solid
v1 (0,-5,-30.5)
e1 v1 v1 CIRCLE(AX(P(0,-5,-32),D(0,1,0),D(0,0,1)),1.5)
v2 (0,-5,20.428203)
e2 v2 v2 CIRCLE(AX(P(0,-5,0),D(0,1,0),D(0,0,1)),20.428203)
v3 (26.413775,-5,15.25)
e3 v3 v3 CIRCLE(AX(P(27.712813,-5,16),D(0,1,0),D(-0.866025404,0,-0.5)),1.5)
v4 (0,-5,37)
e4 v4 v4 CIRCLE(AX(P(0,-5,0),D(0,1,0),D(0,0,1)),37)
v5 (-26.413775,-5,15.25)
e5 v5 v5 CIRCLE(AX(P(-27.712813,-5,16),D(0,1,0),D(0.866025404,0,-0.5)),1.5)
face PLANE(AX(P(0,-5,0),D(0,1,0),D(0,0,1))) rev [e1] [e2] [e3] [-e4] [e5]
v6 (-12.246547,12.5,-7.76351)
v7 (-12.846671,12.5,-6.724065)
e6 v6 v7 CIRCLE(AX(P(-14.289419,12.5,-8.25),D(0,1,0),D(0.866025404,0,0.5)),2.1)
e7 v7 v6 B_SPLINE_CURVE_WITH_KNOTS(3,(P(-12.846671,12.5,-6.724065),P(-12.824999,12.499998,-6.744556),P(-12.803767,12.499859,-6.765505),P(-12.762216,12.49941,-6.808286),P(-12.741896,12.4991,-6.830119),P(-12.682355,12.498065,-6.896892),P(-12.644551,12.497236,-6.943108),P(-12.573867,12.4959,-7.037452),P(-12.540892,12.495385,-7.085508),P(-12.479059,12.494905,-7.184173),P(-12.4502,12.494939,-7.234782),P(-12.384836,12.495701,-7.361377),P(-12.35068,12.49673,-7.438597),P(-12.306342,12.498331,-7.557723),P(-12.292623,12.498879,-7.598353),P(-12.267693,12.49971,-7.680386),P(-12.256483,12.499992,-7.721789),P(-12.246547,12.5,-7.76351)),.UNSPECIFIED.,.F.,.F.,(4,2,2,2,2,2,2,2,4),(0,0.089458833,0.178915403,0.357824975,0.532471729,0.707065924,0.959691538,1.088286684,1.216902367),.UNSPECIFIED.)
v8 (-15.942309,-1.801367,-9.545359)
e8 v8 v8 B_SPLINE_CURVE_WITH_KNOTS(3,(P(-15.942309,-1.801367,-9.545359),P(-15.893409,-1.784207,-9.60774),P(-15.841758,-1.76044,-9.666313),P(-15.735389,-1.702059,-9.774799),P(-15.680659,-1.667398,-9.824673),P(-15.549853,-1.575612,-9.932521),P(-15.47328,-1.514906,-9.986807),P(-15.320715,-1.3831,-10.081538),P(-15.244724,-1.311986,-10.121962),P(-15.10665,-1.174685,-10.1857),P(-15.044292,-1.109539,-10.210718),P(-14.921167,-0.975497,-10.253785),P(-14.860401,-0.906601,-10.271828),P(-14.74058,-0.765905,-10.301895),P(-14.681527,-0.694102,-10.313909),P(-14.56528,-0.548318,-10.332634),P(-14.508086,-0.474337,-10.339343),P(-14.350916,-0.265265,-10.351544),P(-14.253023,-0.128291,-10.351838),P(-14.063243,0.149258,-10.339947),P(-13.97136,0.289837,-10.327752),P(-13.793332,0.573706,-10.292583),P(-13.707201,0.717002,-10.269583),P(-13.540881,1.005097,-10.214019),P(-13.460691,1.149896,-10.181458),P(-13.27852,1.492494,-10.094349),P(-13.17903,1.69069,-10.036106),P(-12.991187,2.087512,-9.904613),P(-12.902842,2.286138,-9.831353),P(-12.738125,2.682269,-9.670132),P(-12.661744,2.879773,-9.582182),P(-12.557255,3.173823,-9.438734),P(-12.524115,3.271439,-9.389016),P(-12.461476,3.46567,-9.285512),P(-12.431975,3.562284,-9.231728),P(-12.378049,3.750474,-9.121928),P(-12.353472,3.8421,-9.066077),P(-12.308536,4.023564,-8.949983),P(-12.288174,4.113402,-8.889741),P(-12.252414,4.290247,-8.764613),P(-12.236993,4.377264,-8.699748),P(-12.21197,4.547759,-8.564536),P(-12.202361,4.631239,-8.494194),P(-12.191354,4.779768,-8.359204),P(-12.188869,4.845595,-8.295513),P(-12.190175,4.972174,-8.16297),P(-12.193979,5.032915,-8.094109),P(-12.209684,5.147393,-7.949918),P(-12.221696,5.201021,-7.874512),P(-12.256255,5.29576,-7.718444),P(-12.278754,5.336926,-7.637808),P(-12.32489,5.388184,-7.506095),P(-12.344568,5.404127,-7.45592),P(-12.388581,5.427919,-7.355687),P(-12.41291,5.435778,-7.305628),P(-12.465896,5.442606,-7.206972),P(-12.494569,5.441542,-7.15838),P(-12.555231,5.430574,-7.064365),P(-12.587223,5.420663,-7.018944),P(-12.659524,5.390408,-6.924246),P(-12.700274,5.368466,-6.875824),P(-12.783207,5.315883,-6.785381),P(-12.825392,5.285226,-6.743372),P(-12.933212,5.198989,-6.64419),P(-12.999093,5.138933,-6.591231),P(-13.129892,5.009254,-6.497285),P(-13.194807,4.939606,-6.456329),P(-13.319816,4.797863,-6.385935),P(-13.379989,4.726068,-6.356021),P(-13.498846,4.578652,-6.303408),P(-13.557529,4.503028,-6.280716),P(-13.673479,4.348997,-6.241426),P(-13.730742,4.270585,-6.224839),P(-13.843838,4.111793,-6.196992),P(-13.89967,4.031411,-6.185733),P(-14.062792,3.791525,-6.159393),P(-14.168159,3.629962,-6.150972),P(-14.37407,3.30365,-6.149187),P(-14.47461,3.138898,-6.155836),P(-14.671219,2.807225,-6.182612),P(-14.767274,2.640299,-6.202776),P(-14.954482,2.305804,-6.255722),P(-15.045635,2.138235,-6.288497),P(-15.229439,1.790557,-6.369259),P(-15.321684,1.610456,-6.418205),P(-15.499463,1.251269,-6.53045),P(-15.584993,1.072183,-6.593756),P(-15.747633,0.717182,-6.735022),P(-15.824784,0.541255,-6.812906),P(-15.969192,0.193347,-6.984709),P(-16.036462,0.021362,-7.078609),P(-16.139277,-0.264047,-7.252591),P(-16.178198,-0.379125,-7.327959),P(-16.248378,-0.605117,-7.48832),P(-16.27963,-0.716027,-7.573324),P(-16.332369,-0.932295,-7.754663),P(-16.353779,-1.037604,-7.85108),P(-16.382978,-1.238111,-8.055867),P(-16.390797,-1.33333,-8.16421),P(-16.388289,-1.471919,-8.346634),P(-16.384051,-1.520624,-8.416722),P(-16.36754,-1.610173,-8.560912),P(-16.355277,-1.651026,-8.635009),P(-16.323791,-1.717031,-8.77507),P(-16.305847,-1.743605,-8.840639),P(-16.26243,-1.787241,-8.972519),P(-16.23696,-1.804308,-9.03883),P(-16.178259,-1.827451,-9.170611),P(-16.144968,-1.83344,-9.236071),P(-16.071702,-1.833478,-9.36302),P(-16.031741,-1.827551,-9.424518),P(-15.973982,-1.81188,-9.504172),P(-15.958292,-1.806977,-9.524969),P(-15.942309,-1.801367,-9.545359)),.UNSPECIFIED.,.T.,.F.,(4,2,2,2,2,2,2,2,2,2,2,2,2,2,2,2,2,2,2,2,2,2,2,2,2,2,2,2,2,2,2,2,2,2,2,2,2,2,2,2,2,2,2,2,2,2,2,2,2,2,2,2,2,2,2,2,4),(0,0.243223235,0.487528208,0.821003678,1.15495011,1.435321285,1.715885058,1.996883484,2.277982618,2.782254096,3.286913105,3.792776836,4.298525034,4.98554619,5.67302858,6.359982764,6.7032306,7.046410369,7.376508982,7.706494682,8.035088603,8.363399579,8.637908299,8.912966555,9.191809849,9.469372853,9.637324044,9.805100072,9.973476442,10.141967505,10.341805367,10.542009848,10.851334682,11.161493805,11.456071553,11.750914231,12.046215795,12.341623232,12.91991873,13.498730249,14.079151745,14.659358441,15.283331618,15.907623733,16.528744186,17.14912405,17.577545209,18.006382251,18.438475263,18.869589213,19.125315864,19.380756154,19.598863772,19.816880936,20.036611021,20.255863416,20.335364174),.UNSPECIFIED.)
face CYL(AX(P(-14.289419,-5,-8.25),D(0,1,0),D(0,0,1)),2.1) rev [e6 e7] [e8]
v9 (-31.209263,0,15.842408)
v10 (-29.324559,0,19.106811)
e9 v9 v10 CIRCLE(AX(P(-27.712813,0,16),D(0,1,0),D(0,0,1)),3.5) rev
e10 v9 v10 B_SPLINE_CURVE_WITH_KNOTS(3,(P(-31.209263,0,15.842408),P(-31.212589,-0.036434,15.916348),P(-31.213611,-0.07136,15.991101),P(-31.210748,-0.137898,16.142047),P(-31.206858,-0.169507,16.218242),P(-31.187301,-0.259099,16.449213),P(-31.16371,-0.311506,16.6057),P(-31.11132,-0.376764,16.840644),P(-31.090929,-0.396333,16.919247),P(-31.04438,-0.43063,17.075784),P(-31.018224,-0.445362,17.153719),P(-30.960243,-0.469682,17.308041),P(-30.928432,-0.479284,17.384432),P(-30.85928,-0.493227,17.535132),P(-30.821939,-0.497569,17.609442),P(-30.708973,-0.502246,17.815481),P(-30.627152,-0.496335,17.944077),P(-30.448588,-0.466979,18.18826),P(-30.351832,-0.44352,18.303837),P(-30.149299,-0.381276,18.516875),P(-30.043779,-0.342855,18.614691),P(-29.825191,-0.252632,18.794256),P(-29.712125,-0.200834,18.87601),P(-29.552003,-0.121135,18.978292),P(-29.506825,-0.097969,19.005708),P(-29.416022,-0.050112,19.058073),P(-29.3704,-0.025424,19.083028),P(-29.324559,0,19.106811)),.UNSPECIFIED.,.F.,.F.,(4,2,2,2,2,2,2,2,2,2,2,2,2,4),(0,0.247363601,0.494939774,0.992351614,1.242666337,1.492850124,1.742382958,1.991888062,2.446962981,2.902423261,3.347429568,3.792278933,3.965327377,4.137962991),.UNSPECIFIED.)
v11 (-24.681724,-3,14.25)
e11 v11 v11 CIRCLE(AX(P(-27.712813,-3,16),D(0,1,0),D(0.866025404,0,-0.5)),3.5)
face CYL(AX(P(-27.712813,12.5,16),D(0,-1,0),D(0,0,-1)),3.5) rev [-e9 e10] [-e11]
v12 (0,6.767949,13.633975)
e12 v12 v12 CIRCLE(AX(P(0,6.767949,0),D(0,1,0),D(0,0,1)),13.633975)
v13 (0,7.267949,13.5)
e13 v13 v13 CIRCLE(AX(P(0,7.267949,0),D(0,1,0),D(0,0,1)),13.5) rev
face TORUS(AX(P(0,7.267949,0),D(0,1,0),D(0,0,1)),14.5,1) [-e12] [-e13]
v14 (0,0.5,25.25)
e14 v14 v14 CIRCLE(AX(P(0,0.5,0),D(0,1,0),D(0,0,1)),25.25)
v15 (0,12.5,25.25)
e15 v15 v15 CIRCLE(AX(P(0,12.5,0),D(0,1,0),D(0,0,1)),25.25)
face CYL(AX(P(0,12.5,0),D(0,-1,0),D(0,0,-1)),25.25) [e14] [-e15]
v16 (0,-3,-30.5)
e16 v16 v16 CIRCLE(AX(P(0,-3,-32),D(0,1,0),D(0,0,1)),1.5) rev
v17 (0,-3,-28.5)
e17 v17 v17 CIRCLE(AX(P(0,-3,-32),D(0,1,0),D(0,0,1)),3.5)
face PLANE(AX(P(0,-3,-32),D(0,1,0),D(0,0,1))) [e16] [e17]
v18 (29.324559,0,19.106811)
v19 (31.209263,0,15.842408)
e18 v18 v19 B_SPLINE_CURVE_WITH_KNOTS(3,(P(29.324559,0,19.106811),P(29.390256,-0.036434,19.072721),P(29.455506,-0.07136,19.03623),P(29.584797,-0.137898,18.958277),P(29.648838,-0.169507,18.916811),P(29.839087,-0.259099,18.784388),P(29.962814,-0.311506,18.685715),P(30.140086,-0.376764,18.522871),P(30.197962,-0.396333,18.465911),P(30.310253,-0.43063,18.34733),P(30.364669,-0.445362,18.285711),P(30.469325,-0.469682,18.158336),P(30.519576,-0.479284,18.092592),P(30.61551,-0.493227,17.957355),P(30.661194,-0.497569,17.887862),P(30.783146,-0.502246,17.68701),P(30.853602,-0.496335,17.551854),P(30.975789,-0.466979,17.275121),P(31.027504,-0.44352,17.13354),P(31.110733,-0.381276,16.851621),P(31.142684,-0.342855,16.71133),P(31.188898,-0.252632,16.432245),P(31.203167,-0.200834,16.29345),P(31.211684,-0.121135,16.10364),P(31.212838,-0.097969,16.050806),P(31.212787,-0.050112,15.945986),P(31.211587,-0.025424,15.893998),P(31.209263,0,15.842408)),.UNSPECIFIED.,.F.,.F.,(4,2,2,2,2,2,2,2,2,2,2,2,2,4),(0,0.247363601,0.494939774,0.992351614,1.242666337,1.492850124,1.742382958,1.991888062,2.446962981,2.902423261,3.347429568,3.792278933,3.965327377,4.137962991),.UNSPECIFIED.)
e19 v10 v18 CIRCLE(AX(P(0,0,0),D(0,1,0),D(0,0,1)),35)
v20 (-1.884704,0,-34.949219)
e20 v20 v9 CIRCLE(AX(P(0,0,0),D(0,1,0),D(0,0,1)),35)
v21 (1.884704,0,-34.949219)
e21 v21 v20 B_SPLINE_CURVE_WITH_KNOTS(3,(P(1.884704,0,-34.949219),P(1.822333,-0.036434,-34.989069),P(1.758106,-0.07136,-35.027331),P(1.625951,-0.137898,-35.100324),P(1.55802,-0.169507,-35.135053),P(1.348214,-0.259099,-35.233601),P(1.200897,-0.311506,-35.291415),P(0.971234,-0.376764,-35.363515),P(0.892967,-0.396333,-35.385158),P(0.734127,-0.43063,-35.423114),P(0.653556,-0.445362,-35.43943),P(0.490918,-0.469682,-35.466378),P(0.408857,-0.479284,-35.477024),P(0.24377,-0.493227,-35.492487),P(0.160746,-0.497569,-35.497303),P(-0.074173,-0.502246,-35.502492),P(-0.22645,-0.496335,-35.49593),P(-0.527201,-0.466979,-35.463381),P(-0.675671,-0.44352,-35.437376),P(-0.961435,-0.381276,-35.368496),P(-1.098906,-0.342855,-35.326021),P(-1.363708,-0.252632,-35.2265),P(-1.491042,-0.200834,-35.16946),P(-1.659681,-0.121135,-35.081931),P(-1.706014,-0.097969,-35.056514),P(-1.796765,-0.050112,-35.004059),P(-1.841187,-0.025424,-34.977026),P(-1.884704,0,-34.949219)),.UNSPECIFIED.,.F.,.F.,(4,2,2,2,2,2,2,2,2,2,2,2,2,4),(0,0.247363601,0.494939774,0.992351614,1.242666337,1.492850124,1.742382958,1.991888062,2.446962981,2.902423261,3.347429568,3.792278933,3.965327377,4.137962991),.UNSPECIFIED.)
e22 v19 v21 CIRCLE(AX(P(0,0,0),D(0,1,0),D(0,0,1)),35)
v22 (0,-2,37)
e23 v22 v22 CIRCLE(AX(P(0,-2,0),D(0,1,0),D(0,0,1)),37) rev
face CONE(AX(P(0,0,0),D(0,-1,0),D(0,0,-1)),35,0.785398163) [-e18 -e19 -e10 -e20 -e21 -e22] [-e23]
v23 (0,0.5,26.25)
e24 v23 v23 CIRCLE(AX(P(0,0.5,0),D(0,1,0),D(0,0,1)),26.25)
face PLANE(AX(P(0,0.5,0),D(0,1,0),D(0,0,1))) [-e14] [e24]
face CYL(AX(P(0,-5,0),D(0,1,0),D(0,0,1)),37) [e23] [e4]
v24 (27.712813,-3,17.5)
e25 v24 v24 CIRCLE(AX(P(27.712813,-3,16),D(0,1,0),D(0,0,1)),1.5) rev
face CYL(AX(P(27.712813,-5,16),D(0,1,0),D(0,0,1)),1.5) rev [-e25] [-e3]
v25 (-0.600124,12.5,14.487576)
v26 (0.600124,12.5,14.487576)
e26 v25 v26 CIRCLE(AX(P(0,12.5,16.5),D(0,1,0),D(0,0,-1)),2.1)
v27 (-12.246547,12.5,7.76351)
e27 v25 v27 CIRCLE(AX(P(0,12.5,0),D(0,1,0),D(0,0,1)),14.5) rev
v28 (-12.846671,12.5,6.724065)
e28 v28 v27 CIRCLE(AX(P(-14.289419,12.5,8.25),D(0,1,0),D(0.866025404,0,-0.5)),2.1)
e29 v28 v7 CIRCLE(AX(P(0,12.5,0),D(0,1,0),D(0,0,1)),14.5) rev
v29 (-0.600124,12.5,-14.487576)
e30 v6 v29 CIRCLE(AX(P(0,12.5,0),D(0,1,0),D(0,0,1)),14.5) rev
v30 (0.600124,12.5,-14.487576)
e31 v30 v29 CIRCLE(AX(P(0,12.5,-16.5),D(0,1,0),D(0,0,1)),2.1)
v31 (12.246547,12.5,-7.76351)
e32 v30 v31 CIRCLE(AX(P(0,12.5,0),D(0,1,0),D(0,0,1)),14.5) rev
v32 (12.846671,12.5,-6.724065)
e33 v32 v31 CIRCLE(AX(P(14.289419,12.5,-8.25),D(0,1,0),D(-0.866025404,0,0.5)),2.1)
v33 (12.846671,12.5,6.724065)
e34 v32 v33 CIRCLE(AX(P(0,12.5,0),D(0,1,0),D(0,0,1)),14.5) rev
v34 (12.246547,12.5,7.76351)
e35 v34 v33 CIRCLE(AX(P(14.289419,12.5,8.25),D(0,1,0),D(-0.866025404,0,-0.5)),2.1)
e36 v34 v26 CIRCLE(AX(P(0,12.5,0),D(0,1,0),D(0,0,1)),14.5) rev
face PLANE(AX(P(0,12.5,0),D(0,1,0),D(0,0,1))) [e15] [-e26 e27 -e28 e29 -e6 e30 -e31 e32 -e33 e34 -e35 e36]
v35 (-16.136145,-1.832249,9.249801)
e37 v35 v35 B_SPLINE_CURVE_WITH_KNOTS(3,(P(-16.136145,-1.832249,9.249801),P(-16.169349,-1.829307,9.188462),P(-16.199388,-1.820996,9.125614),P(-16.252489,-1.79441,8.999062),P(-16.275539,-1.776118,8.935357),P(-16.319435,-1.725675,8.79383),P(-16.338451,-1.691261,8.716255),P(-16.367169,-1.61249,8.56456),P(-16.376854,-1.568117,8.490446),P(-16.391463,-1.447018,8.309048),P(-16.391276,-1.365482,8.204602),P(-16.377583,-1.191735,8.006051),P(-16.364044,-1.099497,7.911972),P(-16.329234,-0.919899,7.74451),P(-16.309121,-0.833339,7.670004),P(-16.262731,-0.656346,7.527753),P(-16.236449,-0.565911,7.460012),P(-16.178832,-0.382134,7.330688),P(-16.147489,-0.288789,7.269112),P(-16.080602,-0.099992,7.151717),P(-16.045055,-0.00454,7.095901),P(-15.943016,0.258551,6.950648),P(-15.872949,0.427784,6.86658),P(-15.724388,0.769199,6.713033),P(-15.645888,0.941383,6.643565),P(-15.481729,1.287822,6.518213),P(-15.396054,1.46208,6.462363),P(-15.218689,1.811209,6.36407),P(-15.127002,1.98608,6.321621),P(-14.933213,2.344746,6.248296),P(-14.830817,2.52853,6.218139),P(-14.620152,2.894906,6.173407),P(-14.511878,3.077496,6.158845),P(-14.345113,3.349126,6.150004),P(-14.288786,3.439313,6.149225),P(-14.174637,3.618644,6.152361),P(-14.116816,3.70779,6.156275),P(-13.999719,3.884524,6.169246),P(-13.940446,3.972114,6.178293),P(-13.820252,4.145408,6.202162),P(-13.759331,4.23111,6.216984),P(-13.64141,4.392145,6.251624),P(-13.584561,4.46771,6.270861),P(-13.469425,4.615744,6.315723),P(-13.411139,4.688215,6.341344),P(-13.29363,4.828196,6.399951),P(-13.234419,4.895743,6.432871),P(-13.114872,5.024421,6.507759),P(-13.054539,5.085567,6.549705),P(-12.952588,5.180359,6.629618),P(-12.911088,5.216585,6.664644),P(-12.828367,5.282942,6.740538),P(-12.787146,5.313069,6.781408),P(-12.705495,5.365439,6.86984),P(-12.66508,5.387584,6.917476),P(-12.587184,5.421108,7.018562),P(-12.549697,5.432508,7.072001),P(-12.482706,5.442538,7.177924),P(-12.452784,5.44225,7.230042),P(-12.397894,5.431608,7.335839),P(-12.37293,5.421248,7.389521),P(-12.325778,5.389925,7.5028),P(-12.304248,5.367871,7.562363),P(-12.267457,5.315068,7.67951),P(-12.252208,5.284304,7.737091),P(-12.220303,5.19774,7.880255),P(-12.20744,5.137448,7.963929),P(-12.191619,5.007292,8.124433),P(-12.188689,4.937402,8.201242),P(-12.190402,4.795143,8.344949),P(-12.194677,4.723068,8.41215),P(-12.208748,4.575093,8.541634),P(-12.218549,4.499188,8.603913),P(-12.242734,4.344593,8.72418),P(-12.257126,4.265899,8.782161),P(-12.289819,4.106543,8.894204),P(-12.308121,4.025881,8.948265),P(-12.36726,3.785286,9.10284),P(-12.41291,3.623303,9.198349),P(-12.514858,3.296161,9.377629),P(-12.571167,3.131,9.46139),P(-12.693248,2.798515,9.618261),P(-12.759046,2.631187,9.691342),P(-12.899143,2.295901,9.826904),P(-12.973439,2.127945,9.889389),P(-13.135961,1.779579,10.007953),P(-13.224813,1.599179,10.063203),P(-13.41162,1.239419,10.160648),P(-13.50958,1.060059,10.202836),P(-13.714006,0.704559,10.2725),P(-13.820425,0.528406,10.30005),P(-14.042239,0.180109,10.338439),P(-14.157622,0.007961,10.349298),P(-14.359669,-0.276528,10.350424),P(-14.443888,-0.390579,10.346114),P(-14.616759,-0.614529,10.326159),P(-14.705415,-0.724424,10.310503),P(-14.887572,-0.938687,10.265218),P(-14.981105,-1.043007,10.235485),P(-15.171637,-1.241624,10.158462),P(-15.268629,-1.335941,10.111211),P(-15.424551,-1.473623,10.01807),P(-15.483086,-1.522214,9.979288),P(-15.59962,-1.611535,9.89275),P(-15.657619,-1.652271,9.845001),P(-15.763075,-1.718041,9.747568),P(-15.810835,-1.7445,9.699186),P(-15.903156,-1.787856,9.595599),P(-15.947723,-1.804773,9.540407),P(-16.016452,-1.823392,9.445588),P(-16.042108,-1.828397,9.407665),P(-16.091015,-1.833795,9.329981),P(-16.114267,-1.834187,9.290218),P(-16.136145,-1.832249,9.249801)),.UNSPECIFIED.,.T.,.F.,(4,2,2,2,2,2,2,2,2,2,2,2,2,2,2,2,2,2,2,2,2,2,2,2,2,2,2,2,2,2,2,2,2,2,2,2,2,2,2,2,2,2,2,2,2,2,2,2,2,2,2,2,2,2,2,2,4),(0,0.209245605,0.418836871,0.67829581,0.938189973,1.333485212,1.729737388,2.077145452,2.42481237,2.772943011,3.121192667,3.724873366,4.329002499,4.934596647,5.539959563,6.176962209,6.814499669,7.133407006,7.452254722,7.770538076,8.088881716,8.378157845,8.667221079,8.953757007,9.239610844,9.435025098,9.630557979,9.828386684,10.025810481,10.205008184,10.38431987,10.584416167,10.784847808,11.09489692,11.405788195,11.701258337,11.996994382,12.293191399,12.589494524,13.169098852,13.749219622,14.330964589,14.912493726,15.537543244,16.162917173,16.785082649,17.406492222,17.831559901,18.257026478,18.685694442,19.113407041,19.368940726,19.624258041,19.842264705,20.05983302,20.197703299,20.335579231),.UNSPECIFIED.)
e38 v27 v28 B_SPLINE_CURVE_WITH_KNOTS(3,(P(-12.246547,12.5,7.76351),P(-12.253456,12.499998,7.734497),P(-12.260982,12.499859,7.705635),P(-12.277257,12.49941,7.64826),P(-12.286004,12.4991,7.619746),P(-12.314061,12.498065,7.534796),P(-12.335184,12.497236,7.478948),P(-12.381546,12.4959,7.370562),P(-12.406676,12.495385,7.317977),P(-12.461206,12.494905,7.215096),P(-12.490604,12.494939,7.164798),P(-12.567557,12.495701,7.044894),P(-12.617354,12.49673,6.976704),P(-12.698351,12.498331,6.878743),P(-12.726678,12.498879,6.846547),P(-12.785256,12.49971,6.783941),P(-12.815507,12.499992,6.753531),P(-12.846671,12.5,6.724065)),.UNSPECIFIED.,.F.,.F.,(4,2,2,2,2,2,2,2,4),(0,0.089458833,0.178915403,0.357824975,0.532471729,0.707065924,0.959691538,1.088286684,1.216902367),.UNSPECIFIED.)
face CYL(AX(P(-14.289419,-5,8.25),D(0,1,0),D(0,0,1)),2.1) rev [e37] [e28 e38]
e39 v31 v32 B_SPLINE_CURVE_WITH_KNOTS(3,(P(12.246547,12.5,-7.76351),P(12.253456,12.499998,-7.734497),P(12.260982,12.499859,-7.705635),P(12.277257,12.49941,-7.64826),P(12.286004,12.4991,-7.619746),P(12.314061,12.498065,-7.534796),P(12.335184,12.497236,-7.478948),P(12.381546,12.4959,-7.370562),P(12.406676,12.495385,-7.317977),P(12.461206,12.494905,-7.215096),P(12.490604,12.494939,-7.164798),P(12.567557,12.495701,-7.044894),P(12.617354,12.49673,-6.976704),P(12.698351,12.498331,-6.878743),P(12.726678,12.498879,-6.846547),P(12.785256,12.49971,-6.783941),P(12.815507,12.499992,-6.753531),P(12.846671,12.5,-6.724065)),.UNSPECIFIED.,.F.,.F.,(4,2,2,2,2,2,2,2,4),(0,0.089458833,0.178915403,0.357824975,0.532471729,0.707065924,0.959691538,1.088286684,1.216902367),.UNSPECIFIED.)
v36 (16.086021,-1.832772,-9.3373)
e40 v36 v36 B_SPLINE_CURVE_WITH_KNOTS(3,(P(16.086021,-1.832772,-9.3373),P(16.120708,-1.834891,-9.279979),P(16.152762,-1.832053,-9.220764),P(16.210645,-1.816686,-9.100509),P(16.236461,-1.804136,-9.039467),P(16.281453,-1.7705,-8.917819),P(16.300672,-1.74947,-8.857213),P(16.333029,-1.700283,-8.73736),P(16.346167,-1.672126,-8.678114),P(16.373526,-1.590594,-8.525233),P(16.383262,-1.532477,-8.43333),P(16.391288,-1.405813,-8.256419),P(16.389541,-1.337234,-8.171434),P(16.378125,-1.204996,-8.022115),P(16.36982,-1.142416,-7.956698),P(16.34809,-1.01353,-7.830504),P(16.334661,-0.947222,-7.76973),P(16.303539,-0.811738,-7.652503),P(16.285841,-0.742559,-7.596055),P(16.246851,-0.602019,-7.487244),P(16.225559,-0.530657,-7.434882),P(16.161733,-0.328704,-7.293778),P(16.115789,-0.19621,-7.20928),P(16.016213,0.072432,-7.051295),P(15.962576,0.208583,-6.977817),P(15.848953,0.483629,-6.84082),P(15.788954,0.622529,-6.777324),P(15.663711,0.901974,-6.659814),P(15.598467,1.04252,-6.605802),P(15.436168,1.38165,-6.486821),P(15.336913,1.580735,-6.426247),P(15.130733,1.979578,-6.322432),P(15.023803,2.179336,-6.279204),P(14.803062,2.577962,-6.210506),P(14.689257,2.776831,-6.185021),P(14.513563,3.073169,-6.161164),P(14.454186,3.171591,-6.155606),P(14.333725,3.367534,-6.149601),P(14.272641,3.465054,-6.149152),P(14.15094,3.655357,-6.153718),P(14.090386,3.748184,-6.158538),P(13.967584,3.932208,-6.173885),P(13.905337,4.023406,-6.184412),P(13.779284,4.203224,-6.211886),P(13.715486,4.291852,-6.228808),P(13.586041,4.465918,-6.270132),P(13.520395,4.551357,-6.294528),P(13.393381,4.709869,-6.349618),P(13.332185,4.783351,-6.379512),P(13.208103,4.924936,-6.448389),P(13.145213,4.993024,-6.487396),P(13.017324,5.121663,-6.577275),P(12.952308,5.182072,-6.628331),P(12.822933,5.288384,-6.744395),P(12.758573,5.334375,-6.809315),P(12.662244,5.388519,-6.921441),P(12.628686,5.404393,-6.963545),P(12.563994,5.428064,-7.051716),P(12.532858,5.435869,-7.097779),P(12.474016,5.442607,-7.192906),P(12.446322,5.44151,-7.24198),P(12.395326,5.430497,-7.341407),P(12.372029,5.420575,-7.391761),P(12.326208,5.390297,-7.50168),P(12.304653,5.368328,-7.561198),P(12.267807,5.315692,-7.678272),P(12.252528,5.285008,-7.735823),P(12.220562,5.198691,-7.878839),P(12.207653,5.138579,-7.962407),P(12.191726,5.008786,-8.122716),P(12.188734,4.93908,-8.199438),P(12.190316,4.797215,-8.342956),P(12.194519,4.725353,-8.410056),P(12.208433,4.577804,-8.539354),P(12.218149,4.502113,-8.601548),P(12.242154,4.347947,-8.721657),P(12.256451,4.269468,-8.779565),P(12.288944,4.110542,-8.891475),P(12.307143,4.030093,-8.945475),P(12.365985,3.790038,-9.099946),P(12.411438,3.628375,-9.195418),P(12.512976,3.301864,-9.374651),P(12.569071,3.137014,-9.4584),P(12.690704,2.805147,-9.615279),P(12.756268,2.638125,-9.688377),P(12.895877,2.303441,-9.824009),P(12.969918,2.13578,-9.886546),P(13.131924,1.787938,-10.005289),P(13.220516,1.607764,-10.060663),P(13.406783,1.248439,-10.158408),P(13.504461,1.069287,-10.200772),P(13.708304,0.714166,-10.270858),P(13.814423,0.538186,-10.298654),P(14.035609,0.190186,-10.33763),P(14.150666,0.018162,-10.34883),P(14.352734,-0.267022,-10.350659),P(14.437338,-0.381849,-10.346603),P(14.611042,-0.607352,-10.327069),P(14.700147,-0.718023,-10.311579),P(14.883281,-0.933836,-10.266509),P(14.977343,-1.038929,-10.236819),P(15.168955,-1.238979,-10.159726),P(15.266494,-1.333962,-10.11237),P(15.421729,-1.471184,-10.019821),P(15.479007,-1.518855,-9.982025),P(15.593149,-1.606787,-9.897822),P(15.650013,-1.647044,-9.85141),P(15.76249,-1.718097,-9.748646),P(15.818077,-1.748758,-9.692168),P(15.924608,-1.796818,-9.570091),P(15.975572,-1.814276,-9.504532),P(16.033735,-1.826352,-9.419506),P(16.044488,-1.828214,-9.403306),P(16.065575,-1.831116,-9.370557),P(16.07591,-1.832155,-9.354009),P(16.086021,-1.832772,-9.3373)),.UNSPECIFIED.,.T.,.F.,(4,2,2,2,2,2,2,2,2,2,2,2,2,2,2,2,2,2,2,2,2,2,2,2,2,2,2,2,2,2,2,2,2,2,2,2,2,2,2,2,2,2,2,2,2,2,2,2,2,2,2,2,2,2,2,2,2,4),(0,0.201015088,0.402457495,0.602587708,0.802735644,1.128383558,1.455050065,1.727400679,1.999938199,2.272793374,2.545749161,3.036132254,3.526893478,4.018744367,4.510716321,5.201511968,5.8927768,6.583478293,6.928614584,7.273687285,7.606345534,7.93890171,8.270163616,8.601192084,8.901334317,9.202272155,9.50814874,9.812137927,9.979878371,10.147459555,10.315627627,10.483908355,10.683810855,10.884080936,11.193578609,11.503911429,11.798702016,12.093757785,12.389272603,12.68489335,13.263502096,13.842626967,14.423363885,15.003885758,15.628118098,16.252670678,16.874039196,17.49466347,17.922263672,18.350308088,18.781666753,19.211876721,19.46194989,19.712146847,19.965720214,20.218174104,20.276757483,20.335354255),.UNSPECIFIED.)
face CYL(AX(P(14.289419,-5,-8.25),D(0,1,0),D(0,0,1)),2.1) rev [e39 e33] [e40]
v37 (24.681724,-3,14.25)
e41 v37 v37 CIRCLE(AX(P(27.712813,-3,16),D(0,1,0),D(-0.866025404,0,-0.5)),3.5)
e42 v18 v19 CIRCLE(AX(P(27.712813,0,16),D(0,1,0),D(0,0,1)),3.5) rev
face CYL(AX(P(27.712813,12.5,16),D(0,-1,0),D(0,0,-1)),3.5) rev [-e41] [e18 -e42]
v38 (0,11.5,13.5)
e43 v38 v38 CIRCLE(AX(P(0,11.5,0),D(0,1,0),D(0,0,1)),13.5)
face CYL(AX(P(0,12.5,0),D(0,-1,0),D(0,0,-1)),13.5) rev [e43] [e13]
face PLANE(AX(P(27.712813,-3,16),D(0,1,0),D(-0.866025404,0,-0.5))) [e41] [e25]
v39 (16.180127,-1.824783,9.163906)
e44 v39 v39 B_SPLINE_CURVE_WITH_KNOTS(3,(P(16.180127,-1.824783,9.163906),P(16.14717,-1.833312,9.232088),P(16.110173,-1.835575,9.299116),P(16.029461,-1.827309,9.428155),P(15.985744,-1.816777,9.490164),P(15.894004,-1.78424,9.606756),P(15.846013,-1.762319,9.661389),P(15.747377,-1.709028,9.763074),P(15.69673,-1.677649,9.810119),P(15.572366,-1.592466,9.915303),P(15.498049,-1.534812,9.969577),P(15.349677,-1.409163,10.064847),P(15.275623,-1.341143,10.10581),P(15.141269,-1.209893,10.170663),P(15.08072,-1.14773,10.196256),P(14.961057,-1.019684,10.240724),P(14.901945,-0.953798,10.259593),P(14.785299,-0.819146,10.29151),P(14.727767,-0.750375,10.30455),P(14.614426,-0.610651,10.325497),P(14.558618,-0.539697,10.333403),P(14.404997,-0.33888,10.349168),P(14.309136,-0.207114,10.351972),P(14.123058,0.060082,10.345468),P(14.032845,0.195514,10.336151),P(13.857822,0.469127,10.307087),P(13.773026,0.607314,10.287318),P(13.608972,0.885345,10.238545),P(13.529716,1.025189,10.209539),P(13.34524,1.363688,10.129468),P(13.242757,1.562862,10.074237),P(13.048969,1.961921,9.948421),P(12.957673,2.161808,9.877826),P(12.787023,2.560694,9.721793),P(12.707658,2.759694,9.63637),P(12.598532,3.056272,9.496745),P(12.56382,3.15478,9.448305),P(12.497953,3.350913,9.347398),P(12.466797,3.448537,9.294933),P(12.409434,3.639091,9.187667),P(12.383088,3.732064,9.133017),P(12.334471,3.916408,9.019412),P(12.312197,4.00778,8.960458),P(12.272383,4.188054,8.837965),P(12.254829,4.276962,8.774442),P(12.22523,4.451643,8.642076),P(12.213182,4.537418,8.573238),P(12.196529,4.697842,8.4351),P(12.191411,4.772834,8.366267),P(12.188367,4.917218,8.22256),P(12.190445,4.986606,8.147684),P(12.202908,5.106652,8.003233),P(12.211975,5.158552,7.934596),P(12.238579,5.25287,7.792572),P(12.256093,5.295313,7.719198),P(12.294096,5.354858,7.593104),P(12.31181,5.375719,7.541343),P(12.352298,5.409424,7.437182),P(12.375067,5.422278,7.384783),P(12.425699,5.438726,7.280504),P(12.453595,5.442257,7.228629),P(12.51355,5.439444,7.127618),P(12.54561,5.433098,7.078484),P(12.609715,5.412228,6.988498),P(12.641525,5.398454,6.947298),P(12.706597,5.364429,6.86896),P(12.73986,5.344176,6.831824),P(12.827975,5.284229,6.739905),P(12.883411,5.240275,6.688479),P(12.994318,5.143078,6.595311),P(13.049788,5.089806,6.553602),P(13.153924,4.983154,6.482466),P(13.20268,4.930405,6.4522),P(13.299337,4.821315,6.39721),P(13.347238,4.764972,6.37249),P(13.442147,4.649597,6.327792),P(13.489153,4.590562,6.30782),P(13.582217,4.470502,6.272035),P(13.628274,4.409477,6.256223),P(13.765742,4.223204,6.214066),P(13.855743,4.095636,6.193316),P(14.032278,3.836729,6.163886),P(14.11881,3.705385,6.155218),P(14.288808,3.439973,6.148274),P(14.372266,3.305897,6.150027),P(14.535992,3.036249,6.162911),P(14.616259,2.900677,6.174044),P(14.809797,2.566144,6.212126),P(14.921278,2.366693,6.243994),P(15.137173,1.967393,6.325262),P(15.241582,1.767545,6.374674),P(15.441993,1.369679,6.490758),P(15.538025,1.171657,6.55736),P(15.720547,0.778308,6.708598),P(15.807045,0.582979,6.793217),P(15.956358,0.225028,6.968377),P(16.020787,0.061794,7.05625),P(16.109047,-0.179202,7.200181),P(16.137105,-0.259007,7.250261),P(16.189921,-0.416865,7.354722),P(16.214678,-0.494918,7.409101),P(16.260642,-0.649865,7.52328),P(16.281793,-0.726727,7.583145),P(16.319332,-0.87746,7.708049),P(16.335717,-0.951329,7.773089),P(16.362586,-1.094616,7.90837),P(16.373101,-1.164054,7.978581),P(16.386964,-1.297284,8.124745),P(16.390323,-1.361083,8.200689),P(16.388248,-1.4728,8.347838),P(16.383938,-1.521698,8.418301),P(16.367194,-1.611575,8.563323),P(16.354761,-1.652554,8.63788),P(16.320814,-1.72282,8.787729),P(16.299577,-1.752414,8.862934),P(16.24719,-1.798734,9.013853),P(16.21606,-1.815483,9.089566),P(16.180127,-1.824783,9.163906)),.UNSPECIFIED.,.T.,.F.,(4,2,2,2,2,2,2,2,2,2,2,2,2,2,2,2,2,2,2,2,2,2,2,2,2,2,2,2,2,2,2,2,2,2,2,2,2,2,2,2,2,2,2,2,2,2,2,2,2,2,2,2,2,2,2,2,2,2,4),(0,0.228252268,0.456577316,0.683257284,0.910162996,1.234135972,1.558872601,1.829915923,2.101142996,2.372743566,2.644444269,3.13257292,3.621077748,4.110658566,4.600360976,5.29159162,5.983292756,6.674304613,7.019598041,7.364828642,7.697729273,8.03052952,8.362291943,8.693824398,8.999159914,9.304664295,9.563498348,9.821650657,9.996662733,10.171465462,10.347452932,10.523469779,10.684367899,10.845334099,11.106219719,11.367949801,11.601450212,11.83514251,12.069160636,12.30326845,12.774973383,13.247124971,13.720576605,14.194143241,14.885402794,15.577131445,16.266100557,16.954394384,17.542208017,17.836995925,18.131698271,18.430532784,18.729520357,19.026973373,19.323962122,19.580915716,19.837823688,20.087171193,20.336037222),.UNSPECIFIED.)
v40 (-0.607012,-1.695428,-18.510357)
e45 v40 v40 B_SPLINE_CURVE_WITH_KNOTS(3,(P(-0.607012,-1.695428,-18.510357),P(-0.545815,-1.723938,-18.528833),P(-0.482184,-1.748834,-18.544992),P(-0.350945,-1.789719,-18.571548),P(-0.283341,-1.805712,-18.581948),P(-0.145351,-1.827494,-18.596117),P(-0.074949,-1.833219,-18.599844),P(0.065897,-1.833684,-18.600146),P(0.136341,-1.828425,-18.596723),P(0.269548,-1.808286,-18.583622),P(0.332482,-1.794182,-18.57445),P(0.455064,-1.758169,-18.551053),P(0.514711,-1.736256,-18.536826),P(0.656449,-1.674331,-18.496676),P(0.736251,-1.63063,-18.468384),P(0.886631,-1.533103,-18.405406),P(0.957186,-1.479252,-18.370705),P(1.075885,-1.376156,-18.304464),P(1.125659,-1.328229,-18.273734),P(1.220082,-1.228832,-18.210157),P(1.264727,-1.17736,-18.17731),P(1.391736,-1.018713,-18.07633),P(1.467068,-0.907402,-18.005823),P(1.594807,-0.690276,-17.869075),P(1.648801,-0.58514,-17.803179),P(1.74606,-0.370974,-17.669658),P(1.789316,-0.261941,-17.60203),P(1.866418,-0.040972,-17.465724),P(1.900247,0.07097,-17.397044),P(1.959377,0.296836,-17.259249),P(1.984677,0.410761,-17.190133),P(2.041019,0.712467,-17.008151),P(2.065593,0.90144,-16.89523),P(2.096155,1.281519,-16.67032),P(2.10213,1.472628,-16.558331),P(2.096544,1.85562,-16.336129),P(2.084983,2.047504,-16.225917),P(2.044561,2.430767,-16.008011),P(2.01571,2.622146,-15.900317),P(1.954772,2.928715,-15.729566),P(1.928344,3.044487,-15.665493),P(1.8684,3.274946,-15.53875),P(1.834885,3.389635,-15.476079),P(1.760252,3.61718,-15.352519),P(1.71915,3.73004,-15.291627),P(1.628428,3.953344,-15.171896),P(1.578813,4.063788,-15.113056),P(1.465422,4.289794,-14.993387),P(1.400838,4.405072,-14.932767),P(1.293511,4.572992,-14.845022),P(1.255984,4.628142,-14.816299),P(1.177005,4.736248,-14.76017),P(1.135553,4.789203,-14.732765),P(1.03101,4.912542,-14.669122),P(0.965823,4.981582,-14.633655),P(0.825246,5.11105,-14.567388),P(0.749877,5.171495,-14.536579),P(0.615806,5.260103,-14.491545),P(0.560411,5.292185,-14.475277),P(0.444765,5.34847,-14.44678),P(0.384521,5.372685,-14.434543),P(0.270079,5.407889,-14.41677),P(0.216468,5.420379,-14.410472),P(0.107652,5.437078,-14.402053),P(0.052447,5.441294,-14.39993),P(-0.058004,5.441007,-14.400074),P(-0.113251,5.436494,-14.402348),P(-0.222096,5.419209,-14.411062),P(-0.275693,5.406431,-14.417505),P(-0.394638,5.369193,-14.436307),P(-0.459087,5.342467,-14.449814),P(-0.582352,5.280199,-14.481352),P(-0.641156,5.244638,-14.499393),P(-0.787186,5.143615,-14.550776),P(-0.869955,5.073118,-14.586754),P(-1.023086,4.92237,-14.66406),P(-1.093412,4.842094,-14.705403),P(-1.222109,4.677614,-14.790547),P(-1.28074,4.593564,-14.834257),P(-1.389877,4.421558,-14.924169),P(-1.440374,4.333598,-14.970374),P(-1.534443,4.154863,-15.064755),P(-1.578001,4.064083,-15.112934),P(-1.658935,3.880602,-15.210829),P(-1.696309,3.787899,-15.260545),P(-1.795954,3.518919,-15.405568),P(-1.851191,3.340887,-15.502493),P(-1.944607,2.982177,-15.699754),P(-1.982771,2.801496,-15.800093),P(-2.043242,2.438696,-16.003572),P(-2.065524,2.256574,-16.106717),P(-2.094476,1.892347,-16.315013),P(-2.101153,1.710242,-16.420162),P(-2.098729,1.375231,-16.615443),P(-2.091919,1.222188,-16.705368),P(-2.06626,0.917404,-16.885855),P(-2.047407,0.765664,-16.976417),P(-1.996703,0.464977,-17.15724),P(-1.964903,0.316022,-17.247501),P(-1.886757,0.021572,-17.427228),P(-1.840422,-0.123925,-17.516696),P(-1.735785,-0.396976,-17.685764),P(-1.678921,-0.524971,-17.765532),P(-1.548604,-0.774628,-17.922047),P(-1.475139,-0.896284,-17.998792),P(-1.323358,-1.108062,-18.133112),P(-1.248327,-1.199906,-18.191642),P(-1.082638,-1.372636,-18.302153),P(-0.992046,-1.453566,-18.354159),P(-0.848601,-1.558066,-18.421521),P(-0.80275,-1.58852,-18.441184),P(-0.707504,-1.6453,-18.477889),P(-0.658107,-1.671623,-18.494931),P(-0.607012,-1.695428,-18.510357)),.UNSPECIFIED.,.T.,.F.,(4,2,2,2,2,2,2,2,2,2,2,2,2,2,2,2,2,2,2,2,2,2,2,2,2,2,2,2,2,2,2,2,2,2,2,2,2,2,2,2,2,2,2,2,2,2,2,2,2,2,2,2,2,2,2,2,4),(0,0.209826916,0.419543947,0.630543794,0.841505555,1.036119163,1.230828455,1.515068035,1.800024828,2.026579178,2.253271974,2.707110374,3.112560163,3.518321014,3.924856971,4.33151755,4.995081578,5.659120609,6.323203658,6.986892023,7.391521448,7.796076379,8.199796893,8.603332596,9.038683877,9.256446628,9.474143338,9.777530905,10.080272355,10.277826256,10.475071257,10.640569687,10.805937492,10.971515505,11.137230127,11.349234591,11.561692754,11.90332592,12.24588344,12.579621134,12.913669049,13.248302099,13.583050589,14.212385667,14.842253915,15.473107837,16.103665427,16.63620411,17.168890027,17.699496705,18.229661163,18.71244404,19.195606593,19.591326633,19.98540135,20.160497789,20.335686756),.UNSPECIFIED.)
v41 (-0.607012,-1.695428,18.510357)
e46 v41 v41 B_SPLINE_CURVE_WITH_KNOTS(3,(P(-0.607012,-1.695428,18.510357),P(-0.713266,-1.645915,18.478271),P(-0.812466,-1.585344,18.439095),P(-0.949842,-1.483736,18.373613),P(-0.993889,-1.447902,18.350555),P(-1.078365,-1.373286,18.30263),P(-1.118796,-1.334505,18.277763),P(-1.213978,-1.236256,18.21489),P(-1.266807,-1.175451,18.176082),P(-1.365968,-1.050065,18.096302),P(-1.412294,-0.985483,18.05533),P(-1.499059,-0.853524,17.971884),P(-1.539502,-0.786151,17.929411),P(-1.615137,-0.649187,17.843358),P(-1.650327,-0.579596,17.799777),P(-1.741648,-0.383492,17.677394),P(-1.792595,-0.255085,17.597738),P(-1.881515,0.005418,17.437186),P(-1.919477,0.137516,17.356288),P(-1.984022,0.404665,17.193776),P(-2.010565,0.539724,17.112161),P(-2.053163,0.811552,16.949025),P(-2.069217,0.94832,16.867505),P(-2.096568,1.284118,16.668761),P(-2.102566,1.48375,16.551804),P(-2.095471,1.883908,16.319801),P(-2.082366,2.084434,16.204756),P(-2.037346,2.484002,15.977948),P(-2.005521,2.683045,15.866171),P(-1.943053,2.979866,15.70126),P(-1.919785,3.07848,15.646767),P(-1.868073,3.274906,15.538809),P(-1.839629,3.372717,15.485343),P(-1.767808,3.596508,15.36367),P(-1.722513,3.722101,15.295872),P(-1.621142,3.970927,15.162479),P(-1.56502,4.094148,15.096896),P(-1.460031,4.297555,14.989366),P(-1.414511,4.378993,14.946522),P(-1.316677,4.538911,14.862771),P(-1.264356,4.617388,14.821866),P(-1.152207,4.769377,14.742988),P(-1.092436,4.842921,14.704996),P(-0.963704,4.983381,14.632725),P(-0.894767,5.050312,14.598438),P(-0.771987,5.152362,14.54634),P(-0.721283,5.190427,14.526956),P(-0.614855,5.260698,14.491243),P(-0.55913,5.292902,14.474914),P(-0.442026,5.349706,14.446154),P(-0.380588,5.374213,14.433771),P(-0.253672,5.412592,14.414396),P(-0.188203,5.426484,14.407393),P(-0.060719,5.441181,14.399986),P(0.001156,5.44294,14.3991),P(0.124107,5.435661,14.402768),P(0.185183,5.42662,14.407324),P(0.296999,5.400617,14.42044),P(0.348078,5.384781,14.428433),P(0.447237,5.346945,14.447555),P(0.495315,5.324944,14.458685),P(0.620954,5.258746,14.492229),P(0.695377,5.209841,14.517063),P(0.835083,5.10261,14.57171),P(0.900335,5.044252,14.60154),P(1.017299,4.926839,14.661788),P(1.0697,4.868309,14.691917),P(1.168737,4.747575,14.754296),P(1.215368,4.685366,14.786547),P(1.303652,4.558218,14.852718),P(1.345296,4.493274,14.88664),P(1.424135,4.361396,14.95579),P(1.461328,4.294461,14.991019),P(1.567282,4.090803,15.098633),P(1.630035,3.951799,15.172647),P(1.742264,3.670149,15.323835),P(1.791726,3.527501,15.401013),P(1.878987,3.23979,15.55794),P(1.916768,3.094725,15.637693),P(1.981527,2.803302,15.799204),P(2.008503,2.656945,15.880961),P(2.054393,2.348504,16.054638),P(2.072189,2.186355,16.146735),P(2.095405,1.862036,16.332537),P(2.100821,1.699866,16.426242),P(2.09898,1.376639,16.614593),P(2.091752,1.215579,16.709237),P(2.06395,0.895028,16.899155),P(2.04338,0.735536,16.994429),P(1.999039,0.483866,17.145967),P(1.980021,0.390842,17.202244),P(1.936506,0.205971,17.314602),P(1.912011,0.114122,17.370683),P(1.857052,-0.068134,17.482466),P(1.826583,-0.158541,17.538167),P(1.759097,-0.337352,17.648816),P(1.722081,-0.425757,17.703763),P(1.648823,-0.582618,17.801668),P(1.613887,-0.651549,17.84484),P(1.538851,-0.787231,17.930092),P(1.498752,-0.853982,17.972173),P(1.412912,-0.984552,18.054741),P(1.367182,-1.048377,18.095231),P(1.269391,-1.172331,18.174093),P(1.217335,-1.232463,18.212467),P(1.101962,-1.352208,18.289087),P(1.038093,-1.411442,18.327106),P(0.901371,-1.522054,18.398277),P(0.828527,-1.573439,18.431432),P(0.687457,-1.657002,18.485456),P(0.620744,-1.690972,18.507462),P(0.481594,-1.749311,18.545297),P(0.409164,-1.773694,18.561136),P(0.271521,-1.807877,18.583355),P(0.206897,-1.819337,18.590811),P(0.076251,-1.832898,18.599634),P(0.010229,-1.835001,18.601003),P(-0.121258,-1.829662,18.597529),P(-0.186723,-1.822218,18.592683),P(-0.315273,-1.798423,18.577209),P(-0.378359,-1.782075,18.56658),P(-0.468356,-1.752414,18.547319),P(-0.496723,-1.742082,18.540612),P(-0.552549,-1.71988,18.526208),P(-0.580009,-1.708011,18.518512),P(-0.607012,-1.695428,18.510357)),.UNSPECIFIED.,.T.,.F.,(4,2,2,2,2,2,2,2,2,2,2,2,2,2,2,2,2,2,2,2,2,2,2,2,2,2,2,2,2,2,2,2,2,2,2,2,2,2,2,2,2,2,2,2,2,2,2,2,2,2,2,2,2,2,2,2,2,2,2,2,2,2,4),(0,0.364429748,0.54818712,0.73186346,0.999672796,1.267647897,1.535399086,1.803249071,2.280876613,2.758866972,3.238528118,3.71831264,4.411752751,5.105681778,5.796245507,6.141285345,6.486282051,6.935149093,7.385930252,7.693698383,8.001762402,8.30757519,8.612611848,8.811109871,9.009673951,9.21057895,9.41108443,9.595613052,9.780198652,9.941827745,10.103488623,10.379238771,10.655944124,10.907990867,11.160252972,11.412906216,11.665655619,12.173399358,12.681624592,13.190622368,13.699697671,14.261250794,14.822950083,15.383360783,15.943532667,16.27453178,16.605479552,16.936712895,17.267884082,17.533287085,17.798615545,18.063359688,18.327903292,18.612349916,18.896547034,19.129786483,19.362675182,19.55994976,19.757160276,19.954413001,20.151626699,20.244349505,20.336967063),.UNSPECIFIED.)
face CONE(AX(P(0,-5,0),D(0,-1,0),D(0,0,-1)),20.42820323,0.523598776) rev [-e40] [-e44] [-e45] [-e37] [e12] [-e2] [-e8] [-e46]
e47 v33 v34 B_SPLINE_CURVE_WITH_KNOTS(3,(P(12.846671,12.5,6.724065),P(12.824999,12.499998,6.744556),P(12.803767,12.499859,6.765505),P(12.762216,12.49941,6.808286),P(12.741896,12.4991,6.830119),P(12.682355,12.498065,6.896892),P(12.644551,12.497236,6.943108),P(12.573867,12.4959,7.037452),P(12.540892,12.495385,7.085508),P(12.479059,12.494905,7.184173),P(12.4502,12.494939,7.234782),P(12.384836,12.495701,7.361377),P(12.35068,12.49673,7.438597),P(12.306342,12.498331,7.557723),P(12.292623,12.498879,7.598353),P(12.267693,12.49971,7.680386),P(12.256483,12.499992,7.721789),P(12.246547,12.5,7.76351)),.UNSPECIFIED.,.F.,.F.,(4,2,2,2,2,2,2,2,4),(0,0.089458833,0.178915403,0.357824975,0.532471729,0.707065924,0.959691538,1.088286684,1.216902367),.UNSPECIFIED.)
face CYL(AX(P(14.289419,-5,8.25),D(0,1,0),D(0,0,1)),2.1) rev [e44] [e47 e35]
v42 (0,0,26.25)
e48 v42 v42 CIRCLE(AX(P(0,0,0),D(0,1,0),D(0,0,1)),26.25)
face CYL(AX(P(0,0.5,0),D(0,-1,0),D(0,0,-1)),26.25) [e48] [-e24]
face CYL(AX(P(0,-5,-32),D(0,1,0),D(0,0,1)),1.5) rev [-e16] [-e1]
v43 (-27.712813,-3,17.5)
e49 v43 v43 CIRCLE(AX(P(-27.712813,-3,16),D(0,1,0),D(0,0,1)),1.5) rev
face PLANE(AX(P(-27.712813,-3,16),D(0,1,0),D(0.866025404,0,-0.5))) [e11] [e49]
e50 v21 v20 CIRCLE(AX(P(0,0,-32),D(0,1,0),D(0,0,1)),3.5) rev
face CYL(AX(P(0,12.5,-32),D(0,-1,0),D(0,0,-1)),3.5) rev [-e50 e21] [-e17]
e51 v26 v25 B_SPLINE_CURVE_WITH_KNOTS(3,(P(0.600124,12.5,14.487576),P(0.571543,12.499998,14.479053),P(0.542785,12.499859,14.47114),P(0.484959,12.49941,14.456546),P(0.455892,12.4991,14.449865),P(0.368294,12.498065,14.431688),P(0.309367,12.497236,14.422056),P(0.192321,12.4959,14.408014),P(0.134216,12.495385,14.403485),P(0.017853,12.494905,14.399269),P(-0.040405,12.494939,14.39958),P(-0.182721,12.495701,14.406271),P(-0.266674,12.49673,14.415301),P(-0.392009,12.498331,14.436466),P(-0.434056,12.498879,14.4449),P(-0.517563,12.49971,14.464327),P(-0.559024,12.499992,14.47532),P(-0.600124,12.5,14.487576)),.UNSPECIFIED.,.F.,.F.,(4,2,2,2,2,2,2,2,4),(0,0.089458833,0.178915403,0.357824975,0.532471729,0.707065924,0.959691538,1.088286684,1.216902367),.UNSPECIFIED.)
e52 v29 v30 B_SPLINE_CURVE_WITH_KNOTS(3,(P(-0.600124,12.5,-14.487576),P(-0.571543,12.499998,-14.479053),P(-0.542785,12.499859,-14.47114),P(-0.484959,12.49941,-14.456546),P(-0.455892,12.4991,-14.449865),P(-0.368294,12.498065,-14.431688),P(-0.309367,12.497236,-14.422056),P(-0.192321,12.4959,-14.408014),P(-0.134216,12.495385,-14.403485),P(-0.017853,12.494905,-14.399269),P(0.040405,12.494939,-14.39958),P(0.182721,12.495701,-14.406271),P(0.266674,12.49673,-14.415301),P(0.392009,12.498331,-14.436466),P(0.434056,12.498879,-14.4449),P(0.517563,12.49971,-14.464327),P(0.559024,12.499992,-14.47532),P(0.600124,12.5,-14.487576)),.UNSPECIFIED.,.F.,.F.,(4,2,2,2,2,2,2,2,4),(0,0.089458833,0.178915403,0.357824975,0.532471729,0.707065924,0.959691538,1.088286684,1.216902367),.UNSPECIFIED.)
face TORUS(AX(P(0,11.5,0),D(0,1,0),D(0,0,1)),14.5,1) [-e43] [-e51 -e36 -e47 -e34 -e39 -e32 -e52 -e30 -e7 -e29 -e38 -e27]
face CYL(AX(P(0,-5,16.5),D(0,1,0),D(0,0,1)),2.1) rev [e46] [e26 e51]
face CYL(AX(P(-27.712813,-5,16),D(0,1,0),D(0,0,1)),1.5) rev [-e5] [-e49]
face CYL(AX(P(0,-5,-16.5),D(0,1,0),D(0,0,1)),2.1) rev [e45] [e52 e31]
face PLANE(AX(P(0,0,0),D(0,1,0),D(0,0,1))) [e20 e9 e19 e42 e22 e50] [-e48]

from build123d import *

# Parameters (mm, degrees)
SKETCH1_R           = 25.25
SKETCH1_R_2         = 13.5
BOSS_EXTRUDE1_DEPTH = 12.5
BOSS_EXTRUDE2_START = -5
SKETCH2_R           = 37
SKETCH2_R_2         = 13.5
BOSS_EXTRUDE2_DEPTH = 5
SKETCH3_R           = 1.5000000000000004
CUT_EXTRUDE1_DEPTH  = 54.79823417176441
CUT_EXTRUDE2_START  = -3
SKETCH4_R           = 3.500000000000001
CUT_EXTRUDE2_DEPTH  = 57.79823417176441
CIRPATTERN1_COUNT   = 3
CHAMFER1_SIZE       = 12
CHAMFER1_SIZE2      = 6.928203230275528
CHAMFER2_SIZE       = 2
SKETCH5_R           = 2.100000000000002
CUT_EXTRUDE3_DEPTH  = 56.174722607367954
CIRPATTERN2_COUNT   = 6
FILLET1_R           = 1
SKETCH6_R           = 26.250000000000004
SKETCH6_R_2         = 25.25
BOSS_EXTRUDE3_DEPTH = 0.5


with BuildPart() as part:
    # Sketch1 → Boss-Extrude1 (new body)
    with BuildSketch(Plane(origin=(0, 0, 0), x_dir=(1, 0, 0), z_dir=(0, 1, 0))):
        with Locations(Location((0, 0, 0), (0, 0, 270))):
            Circle(SKETCH1_R)
        with Locations(Location((0, 0, 0), (0, 0, 270))):
            Circle(SKETCH1_R_2, mode=Mode.SUBTRACT)
    extrude(amount=BOSS_EXTRUDE1_DEPTH)

    # Sketch2 → Boss-Extrude2 (add)
    with BuildSketch(Plane(origin=(0, 0, 0), x_dir=(1, 0, 0), z_dir=(0, 1, 0)).offset(BOSS_EXTRUDE2_START)):
        with Locations(Location((0, 0, 0), (0, 0, 270))):
            Circle(SKETCH2_R)
        with Locations(Location((0, 0, 0), (0, 0, 270))):
            Circle(SKETCH2_R_2, mode=Mode.SUBTRACT)
    extrude(amount=BOSS_EXTRUDE2_DEPTH)

    # Sketch3 → Cut-Extrude1 (cut, through all)
    with BuildSketch(Plane(origin=(0, 0, 0), x_dir=(1, 0, 0), z_dir=(0, 1, 0))):
        with Locations(Location((0, 32, 0), (0, 0, 270))):
            Circle(SKETCH3_R)
    cut_extrude1 = extrude(amount=-CUT_EXTRUDE1_DEPTH, mode=Mode.SUBTRACT)

    # Sketch4 → Cut-Extrude2 (cut)
    with BuildSketch(Plane(origin=(0, 0, 0), x_dir=(1, 0, 0), z_dir=(0, 1, 0)).offset(CUT_EXTRUDE2_START)):
        with Locations(Location((0, 32, 0), (0, 0, 270))):
            Circle(SKETCH4_R)
    cut_extrude2 = extrude(amount=CUT_EXTRUDE2_DEPTH, mode=Mode.SUBTRACT)

    # CirPattern1: Cut-Extrude1, Cut-Extrude2 ×3 about axis
    cirpattern1_axis = Axis((-1.23e-15, 0, 1.87e-15), (0, 1, 0))
    add([cut_extrude1.rotate(cirpattern1_axis, i * 360 / CIRPATTERN1_COUNT) for i in range(1, CIRPATTERN1_COUNT)], mode=Mode.SUBTRACT)
    add([cut_extrude2.rotate(cirpattern1_axis, i * 360 / CIRPATTERN1_COUNT) for i in range(1, CIRPATTERN1_COUNT)], mode=Mode.SUBTRACT)

    # Chamfer1
    chamfer1_edges = [part.edges().sort_by_distance(p)[0] for p in [
        (4.13e-15, -5, -13.5),
    ]]
    chamfer1_side = [part.faces().sort_by_distance(p)[0] for p in [
        (4.13e-15, 3.75, -13.5),
    ]]
    chamfer(chamfer1_edges, length=CHAMFER1_SIZE, length2=CHAMFER1_SIZE2, reference=chamfer1_side[0])

    # Chamfer2
    # the kernel refuses this chamfer: 2 mm, written as the material it takes off along each edge
    with BuildSketch(Plane(origin=(0, 0, 0), x_dir=(-1.8e-16, 0, 1), z_dir=(-1, 0, -1.8e-16))) as chamfer2_piece_1:
        Polygon((37, -CHAMFER2_SIZE), (37 - CHAMFER2_SIZE, 0), (37, 0), align=None)
    revolve(axis=Axis((0, 0, 0), (0, 1, 0)), mode=Mode.SUBTRACT)

    # Sketch5 → Cut-Extrude3 (cut, through all)
    with BuildSketch(Plane(origin=(0, 12.5, 0), x_dir=(1, 0, 0), z_dir=(0, 1, 0))):
        with Locations(Location((-6e-17, 16.5, 0), (0, 0, 270))):
            Circle(SKETCH5_R)
    cut_extrude3 = extrude(amount=-CUT_EXTRUDE3_DEPTH, mode=Mode.SUBTRACT)

    # CirPattern2: Cut-Extrude3 ×6 about axis
    cirpattern2_axis = Axis((-1.951e-14, 0, 4.7e-16), (0, 1, 0))
    for i in range(1, CIRPATTERN2_COUNT):
        add(cut_extrude3.rotate(cirpattern2_axis, i * 360 / CIRPATTERN2_COUNT), mode=Mode.SUBTRACT)

    # Fillet1
    # the kernel refuses this fillet: 1 mm, written as the material it takes off along each edge
    with BuildSketch(Plane(origin=(0, 7, 0), x_dir=(-1.8e-16, 0, 1), z_dir=(-1, 0, -1.8e-16))) as fillet1_piece_1:
        with BuildLine():
            CenterArc((13.5 + FILLET1_R, FILLET1_R * 0.267949192431), FILLET1_R, 180, 30.000000000000057)
            Line((13.5 + FILLET1_R * 0.133974596216, -FILLET1_R * 0.232050807569), (13.5, 0))
            Line((13.5, 0), (13.5, FILLET1_R * 0.267949192431))
        make_face()
    revolve(axis=Axis((0, 7, 0), (0, 1, 0)), mode=Mode.SUBTRACT)
    with BuildSketch(Plane(origin=(0, 12.5, 0), x_dir=(-1.8e-16, 0, 1), z_dir=(-1, 0, -1.8e-16))) as fillet1_piece_2:
        with BuildLine():
            CenterArc((13.5 + FILLET1_R, -FILLET1_R), FILLET1_R, 90, 90)
            Line((13.5 + FILLET1_R, 0), (13.5, 0))
            Line((13.5, 0), (13.5, -FILLET1_R))
        make_face()
    revolve(axis=Axis((0, 12.5, 0), (0, 1, 0)), mode=Mode.SUBTRACT)

    # Sketch6 → Boss-Extrude3 (add)
    with BuildSketch(Plane(origin=(0, 0, 0), x_dir=(1, 0, 0), z_dir=(0, 1, 0))):
        with Locations(Location((0, 0, 0), (0, 0, 270))):
            Circle(SKETCH6_R)
        with Locations(Location((0, 0, 0), (0, 0, 270))):
            Circle(SKETCH6_R_2, mode=Mode.SUBTRACT)
    extrude(amount=BOSS_EXTRUDE3_DEPTH)


solid = part.part
